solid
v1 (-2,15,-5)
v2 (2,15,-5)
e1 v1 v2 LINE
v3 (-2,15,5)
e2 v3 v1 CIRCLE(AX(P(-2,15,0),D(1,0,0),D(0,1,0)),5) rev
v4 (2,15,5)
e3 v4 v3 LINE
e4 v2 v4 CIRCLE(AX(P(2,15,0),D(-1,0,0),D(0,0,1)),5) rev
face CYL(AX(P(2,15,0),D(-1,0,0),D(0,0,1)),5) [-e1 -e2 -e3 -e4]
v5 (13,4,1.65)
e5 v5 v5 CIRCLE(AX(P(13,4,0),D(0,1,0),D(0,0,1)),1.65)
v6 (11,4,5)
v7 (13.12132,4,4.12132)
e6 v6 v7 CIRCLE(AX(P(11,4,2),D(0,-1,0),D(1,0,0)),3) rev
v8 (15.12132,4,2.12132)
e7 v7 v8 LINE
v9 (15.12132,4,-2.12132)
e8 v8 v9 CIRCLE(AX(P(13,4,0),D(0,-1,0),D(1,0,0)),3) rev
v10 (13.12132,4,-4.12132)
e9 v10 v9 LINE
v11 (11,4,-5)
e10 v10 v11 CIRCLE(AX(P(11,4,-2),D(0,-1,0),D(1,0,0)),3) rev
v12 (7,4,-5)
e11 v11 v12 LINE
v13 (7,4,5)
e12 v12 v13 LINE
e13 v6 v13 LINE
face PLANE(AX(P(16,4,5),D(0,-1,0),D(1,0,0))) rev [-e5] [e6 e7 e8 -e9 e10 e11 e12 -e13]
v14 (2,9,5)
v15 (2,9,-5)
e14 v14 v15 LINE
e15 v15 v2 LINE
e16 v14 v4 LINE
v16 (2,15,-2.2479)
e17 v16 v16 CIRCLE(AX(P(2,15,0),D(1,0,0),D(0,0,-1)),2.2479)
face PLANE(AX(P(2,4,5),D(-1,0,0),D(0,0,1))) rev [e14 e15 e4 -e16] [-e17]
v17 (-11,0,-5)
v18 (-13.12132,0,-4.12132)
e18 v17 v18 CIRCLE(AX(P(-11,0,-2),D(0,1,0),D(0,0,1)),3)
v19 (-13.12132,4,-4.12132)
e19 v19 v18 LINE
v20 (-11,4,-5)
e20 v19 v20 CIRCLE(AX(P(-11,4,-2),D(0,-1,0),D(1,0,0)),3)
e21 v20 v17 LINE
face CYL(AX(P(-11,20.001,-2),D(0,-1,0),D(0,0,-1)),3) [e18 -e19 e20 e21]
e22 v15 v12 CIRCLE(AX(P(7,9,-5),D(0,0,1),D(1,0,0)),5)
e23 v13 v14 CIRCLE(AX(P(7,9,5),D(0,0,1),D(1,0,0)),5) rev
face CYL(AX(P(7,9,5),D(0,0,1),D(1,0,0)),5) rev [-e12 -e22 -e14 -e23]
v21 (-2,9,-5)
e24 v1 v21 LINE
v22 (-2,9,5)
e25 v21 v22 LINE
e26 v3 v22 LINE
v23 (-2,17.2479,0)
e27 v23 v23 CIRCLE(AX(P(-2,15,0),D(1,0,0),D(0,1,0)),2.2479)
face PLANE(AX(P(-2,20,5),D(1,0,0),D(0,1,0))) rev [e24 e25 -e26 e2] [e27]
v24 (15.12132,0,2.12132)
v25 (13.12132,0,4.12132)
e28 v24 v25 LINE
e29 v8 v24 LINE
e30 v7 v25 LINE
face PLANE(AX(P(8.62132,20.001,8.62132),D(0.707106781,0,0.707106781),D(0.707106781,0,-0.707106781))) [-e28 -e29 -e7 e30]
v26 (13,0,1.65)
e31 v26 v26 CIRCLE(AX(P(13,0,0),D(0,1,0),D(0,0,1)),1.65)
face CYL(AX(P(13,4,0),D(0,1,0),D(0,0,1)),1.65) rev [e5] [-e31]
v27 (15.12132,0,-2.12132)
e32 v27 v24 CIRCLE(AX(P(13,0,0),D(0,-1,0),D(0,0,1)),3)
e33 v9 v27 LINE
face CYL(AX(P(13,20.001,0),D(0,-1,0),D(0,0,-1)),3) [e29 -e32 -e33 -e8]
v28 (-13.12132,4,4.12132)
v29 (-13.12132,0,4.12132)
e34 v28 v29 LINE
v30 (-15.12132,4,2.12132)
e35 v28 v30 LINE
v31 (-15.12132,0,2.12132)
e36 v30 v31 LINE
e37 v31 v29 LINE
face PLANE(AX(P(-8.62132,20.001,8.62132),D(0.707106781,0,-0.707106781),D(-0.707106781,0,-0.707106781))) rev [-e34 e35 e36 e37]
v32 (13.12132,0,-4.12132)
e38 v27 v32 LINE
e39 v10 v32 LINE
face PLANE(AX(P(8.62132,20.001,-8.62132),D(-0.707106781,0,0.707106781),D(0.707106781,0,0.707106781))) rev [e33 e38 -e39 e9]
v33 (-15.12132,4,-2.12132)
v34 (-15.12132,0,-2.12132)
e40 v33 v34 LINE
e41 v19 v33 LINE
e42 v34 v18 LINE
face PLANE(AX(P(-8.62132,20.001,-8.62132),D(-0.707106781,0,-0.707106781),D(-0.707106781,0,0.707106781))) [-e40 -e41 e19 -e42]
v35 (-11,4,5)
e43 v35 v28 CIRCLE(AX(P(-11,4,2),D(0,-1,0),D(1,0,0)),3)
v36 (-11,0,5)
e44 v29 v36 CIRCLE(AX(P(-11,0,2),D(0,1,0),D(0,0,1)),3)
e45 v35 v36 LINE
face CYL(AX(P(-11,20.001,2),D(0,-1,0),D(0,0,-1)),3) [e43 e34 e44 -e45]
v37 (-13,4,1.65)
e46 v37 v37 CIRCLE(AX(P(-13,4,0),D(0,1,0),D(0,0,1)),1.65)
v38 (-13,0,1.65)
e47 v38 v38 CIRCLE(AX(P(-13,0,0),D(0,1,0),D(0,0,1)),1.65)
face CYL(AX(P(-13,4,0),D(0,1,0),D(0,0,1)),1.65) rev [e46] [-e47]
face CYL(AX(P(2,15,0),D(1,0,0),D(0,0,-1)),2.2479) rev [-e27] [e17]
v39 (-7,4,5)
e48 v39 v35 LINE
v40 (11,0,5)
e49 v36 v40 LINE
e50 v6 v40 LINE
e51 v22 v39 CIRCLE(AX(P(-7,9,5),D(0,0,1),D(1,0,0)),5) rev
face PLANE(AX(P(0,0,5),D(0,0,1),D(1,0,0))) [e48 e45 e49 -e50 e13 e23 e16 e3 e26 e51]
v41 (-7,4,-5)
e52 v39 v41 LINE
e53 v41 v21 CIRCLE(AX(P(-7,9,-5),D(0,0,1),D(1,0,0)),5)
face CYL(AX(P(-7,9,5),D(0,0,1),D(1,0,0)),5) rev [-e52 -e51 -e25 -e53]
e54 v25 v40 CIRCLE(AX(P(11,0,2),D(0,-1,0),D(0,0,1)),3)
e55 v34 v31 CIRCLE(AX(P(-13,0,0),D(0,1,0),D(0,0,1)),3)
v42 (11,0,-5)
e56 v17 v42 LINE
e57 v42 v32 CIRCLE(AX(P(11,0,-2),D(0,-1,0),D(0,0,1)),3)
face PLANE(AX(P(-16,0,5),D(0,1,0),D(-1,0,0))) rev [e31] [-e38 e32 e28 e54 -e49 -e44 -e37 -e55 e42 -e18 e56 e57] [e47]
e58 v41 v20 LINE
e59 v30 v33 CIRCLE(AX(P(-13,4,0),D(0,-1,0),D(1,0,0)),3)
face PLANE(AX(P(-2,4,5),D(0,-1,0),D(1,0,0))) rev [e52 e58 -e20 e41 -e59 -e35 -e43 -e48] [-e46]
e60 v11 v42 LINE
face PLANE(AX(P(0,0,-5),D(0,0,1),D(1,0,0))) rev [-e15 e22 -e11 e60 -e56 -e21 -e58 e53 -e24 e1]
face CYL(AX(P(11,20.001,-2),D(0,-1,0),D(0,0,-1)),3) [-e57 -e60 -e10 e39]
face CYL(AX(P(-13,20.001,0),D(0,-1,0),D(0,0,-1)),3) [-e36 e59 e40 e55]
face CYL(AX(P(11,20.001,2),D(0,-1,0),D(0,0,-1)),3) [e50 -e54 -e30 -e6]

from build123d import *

# Parameters (mm, degrees)
BOSS_EXTRUDE1_DEPTH         = 5
F_3_3_3_3_DIAMETER_HOLE1_D  = 3.3
FILLET1_RADIUS              = 5
FILLET1_LENGTH              = 4
FILLET2_R                   = 5
F_16_0_177_DIAMETER_HOLE1_D = 4.4958
CUT_EXTRUDE1_DEPTH          = 4


# Read off the part's stored shape, not the designer's step: Cut-Extrude1
with BuildPart() as part:
    # Sketch1 → Boss-Extrude1 (new, symmetric)
    with BuildSketch(Plane.XY):
        Polygon((-16, 0), (16, 0), (16, 4), (2, 4), (2, 20), (-2, 20), (-2, 4), (-16, 4), align=None)
    extrude(amount=BOSS_EXTRUDE1_DEPTH, both=True)

    # Ø3.3 (3.3) Diameter Hole1 (through all)
    with Locations(Plane(origin=(0, 4, 0), x_dir=(1, 0, 0), z_dir=(0, 1, 0))):
        with Locations((-13, 0), (13, 0)):
            Hole(F_3_3_3_3_DIAMETER_HOLE1_D / 2)

    # Fillet1: full round fillet: the end face becomes a half cylinder, R = half its width
    fillet1_face = Plane((0, 20, 0), x_dir=(-1, 0, 0), z_dir=(0, 1, 0))  # on the end face: x along it, z out of the body
    fillet1_slab = fillet1_face.offset(-FILLET1_RADIUS / 2) * Box(FILLET1_LENGTH, 2 * FILLET1_RADIUS, FILLET1_RADIUS, mode=Mode.PRIVATE)  # the body's end, R deep
    fillet1_round = Plane((0, 15, 0), x_dir=(0, 1, 0), z_dir=(-1, 0, 0)) * Cylinder(FILLET1_RADIUS, FILLET1_LENGTH, mode=Mode.PRIVATE)  # its axis R under the face
    add(fillet1_slab - fillet1_round, mode=Mode.SUBTRACT)

    # Fillet2
    fillet2_edges = [part.edges().sort_by_distance(p)[0] for p in [
        (2, 4, 0),
        (-2, 4, 0),
    ]]
    fillet(fillet2_edges, radius=FILLET2_R)

    # #16 (0.177) Diameter Hole1 (through all)
    with Locations(Plane(origin=(2, 0, 0), x_dir=(0, 0, -1), z_dir=(1, 0, 0))):
        with Locations((0, 15)):
            Hole(F_16_0_177_DIAMETER_HOLE1_D / 2)

    # Cut-Extrude1 outline → Cut-Extrude1 (cut)
    with BuildSketch(Plane(origin=(0, 0, 0), x_dir=(1, 0, 0), z_dir=(0, 1, 0))):
        with BuildLine():
            Line((-16, -5), (-11, -5))
            ThreePointArc((-11, -5), (-12.148050297, -4.771638598), (-13.121320344, -4.121320344))
            Line((-13.121320344, -4.121320344), (-15.121320344, -2.121320344))
            ThreePointArc((-15.121320344, -2.121320344), (-15.771638598, -1.148050297), (-16, 0))
            Line((-16, 0), (-16, -5))
        make_face()
        with BuildLine():
            Line((-16, 5), (-16, 0))
            ThreePointArc((-16, 0), (-15.771638598, 1.148050297), (-15.121320344, 2.121320344))
            Line((-15.121320344, 2.121320344), (-13.121320344, 4.121320344))
            ThreePointArc((-13.121320344, 4.121320344), (-12.148050297, 4.771638598), (-11, 5))
            Line((-11, 5), (-16, 5))
        make_face()
    cut_extrude1 = extrude(amount=CUT_EXTRUDE1_DEPTH, mode=Mode.SUBTRACT)

    # Mirror1: Cut-Extrude1 across plane
    add(cut_extrude1.mirror(Plane(origin=(0, 0, 0), x_dir=(0, 0, 1), z_dir=(1, 0, 0))), mode=Mode.SUBTRACT)


solid = part.part
